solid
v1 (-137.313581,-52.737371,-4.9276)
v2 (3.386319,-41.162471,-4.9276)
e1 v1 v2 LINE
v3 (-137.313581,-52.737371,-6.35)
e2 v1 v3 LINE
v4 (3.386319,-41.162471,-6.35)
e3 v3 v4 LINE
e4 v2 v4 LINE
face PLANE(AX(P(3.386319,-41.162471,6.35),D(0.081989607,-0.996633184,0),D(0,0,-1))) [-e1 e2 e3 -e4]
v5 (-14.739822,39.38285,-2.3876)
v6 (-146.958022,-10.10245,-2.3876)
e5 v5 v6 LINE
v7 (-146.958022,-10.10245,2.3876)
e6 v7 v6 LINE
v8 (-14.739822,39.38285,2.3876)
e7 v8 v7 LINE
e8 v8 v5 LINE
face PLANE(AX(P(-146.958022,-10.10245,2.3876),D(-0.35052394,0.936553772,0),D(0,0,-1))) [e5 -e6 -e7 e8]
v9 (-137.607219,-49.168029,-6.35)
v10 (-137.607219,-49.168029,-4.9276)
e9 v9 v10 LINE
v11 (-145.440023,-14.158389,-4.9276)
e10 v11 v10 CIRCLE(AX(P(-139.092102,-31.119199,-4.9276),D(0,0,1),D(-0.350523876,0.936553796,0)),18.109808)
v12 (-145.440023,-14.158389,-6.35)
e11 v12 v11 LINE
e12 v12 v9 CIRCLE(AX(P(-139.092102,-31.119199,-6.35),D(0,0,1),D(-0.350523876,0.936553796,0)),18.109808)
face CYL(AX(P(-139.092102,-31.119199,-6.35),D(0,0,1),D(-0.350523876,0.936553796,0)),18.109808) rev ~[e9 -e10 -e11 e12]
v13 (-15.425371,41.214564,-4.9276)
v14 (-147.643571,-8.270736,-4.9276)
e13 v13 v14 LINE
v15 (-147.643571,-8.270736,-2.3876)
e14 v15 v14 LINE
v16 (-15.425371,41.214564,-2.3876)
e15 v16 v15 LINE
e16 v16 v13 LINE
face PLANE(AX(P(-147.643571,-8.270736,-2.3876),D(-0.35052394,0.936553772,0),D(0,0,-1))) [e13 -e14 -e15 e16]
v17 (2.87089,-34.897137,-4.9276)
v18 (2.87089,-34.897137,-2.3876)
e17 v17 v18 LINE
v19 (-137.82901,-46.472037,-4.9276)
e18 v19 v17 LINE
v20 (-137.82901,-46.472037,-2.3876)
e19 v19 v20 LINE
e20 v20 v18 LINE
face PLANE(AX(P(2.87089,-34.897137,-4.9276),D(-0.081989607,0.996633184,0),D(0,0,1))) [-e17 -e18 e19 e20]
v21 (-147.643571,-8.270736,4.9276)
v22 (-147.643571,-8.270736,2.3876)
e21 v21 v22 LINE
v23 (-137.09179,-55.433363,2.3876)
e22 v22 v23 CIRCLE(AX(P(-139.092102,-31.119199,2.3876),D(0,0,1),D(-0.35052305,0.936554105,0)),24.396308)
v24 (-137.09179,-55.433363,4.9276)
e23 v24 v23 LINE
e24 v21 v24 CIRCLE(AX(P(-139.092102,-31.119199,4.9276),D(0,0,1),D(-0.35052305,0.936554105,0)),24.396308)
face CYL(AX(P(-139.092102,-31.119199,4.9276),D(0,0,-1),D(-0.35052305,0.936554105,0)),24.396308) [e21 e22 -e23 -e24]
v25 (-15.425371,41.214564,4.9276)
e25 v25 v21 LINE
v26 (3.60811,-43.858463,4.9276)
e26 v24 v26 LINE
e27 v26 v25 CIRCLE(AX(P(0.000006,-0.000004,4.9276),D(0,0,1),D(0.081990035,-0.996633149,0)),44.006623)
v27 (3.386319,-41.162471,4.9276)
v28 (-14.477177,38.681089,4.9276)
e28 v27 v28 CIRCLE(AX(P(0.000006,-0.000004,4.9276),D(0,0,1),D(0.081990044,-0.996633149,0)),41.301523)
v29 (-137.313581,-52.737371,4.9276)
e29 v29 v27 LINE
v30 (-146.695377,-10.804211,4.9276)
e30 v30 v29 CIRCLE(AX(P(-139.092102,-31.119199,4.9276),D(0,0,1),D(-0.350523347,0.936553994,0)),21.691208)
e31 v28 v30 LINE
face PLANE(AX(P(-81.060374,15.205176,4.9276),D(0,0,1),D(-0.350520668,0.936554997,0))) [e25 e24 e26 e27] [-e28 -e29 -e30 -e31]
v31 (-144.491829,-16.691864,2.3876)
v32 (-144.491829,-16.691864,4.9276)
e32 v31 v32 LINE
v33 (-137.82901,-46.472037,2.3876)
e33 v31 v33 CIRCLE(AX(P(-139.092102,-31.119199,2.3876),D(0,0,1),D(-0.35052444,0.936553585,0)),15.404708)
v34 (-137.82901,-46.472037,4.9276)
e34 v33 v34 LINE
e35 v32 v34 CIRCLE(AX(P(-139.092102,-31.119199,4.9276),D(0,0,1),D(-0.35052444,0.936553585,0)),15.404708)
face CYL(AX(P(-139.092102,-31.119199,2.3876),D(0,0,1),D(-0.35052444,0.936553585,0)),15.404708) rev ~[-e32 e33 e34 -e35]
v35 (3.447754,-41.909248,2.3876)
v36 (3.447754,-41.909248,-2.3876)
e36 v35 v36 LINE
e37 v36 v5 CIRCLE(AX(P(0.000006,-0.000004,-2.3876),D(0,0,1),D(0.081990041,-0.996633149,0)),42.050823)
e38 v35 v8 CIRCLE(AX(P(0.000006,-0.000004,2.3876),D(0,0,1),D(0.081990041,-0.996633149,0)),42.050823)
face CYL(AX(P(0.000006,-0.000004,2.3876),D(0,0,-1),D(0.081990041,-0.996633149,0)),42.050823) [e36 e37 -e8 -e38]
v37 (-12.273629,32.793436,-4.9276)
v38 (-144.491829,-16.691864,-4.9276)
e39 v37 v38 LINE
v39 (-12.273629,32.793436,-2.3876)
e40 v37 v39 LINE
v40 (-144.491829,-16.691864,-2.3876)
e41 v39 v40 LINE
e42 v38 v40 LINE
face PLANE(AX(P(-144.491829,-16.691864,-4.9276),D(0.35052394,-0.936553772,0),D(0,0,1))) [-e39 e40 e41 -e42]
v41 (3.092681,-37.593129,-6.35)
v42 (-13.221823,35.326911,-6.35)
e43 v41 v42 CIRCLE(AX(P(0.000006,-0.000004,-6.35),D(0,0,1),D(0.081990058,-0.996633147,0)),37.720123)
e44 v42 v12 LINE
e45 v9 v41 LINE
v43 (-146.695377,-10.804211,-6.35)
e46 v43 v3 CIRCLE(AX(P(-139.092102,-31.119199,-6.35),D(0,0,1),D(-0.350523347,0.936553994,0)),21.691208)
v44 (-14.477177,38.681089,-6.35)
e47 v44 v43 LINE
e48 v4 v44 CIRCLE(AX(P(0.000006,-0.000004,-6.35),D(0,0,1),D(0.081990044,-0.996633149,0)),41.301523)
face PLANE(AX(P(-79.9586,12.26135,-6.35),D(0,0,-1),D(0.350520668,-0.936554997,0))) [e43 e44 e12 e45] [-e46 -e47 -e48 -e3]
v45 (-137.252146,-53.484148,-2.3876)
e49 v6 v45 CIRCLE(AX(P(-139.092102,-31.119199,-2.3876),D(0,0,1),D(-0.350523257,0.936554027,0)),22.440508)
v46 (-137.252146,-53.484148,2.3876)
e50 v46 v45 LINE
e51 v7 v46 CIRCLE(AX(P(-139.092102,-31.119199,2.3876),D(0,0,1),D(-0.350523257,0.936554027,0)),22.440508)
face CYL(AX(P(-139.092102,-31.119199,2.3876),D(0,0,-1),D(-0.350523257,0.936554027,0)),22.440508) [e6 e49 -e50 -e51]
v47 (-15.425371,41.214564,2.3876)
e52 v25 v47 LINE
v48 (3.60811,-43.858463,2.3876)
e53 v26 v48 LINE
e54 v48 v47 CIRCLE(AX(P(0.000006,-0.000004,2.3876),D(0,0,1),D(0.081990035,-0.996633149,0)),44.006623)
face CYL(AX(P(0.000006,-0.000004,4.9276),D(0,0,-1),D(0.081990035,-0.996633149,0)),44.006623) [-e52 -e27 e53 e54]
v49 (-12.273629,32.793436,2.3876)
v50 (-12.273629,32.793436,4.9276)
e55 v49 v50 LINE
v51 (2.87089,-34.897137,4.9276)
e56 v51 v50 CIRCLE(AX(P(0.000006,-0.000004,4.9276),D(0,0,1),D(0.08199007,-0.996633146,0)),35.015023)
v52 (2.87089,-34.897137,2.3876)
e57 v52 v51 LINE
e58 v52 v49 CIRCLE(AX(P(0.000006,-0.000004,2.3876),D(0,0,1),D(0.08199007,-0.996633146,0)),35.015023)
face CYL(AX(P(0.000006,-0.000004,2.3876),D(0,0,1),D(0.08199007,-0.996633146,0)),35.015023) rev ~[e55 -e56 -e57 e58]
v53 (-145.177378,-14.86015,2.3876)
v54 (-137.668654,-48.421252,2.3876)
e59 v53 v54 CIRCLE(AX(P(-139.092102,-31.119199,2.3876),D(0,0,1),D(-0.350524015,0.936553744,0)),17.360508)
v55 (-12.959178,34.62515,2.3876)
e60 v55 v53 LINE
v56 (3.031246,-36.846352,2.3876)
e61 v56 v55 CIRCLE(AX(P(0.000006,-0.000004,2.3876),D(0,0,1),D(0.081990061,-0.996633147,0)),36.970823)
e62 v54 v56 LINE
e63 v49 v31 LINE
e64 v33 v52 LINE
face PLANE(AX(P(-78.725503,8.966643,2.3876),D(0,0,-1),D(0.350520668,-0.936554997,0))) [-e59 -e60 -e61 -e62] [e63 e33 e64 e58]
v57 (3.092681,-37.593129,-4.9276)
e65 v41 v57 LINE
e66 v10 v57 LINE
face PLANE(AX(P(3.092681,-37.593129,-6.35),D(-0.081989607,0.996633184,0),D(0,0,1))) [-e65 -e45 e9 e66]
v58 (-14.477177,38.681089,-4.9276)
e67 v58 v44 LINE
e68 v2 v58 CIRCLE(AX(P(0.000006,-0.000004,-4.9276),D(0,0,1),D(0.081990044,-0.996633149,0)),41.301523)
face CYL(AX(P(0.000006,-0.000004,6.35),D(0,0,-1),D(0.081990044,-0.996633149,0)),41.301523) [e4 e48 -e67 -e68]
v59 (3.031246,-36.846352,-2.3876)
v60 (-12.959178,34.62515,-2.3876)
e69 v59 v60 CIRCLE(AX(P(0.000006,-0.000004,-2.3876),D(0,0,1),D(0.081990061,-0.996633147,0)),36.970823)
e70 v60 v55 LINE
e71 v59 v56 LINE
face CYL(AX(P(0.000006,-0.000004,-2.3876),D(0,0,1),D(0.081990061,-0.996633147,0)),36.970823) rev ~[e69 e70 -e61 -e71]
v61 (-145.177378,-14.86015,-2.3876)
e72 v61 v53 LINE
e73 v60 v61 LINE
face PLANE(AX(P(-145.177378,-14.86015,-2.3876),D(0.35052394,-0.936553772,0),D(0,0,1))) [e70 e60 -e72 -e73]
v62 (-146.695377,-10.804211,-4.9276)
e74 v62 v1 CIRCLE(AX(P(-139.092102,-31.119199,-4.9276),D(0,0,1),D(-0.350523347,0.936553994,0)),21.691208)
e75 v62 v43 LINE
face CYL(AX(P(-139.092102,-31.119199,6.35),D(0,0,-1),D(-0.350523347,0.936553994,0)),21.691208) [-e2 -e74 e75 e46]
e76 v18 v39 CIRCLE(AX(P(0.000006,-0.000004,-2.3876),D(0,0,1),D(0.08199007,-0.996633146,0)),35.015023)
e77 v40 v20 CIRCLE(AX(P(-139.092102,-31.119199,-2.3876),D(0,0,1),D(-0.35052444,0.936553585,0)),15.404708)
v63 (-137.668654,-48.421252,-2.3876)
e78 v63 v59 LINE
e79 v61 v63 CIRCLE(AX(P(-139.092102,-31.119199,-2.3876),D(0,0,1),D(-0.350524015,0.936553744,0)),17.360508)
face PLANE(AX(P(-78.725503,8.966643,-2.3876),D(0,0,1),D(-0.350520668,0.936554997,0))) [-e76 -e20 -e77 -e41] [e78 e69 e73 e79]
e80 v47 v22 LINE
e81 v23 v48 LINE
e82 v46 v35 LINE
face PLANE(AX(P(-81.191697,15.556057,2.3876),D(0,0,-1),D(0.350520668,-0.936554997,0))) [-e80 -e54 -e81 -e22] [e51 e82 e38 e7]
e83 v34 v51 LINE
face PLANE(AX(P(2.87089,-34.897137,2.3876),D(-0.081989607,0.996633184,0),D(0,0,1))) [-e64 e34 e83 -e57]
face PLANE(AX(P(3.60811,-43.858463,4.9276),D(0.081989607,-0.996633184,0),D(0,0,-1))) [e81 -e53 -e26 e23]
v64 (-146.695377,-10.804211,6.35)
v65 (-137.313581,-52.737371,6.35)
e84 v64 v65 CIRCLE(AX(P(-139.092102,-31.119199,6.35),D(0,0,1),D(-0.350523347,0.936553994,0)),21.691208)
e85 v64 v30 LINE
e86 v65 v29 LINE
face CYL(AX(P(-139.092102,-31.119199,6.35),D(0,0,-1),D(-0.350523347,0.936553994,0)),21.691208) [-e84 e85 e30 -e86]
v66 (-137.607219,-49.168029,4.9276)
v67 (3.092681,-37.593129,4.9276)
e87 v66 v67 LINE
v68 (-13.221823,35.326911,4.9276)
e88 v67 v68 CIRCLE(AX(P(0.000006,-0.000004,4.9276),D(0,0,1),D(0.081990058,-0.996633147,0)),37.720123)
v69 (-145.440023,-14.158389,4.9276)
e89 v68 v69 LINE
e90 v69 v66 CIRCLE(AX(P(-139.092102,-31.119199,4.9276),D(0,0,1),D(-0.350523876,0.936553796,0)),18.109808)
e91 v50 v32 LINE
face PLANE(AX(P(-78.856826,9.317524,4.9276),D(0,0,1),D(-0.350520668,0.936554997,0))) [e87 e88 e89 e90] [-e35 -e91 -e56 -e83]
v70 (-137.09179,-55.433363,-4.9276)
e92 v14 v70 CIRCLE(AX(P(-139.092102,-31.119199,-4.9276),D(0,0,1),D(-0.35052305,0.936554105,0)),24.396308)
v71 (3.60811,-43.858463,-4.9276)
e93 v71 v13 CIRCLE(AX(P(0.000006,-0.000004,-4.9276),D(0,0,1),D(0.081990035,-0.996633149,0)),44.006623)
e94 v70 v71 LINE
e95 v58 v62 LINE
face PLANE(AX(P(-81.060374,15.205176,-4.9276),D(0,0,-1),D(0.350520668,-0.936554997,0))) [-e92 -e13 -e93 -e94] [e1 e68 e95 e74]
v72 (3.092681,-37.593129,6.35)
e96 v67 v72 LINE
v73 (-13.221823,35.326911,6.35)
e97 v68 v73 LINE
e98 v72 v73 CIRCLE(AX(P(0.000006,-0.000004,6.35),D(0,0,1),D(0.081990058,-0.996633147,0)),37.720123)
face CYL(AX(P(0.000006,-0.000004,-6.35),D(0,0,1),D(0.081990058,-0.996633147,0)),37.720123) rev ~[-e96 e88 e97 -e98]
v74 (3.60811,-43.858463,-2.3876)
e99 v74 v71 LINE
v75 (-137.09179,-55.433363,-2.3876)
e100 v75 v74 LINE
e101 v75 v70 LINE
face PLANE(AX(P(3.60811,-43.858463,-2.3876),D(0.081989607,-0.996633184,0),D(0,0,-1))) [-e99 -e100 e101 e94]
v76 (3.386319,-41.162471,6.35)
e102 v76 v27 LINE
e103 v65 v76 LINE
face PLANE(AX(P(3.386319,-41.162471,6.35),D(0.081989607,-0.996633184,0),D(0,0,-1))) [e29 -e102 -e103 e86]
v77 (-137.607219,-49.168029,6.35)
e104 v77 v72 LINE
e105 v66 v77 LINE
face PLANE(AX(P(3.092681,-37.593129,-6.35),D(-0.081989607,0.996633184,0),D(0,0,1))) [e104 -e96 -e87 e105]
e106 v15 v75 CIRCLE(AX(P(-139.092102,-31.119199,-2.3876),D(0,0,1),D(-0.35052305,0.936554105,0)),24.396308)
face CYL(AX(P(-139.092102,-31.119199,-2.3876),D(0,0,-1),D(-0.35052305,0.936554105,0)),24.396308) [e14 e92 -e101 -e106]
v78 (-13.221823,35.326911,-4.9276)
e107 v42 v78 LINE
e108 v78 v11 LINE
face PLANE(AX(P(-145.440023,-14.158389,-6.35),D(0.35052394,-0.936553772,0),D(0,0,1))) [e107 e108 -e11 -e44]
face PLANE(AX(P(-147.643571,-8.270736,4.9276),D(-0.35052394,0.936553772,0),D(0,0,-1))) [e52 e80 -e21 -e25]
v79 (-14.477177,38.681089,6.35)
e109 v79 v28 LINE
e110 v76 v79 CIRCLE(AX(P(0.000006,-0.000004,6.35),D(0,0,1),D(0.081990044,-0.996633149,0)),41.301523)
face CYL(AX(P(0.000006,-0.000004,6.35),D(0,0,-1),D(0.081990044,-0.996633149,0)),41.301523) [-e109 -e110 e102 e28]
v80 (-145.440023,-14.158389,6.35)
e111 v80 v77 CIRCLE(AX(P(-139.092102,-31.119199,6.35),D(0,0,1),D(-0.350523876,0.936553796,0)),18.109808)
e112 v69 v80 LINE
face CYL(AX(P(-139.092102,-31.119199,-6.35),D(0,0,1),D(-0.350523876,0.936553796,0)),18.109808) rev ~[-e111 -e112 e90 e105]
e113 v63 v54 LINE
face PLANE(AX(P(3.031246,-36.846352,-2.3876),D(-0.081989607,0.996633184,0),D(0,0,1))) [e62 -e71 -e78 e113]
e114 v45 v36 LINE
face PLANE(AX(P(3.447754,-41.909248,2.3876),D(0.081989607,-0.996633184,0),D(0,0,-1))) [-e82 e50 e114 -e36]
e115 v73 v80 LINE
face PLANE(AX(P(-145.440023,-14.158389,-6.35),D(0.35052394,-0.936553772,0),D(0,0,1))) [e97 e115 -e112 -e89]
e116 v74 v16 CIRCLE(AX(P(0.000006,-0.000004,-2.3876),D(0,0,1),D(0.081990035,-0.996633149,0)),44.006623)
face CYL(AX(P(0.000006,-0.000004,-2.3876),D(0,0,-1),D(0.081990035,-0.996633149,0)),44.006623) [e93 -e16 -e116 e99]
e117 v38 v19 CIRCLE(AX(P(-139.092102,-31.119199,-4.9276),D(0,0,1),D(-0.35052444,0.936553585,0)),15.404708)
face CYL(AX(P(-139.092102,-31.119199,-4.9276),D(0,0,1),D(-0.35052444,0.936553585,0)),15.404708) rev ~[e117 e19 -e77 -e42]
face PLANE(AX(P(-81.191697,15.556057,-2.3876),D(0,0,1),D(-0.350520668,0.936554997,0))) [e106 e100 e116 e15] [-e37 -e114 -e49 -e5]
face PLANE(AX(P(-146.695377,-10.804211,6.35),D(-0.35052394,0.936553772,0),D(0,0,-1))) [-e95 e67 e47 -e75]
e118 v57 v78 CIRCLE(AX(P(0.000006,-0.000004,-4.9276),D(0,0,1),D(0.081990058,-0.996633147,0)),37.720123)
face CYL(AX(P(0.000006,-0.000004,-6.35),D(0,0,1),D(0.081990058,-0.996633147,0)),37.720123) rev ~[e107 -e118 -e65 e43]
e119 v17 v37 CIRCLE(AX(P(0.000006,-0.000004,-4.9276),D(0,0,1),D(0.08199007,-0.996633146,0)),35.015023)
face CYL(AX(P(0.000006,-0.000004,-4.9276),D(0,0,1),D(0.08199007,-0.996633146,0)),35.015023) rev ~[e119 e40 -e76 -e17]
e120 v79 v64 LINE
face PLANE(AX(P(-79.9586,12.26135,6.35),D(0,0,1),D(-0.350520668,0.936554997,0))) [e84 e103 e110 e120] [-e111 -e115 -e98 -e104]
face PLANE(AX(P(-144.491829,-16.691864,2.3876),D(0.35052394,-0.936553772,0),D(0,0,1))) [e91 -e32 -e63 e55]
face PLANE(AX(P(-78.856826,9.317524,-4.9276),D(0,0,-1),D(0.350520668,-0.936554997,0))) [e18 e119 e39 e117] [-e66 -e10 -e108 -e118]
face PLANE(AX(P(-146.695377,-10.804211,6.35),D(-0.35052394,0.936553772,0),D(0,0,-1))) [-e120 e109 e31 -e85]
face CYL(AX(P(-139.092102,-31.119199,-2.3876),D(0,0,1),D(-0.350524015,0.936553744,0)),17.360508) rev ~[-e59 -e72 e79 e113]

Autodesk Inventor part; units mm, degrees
ref_plane "Work Plane2" through (-139.0921, -31.1192, 0) normal (-1, 0, 0) x (0, 0, 1)
ref_plane "Work Plane3" through (0, 0, 0) normal (-0.9907127, -0.1359716, 0) x (0, 0, 1)
sketch "Path" plane through (0, 0, 0) normal (0, 0, 1) x (1, 0, 0)
  arc A0 (-146.0677, -12.4813) -> (-137.4604, -50.9527) centre (-139.0921, -31.1192) ccw
  arc A1 (3.2395, -39.3778) -> (-13.8495, 37.004) centre (0, 0) ccw
  line L0 (3.2395, -39.3778) -> (-137.4604, -50.9527)
  line L1 (-146.0677, -12.4813) -> (-13.8495, 37.004)
  dimension "d31" = 8.9916
ref_plane "Section Plane" through (-137.4604, -50.9527, 0) normal (0.9966332, 0.0819899, 0) x (0, 0, 1)
sketch "Section Sketch" plane through (-137.4604, -50.9527, 0) normal (0.9966332, 0.0819899, 0) x (0, 0, 1)
  line L0 (-6.35, -1.7907) -> (6.35, -1.7907)
  line L1 (6.35, -1.7907) -> (6.35, 1.7907)
  line L2 (6.35, 1.7907) -> (-6.35, 1.7907)
  line L3 (-6.35, 1.7907) -> (-6.35, -1.7907)
  line L4 (-2.3876, -2.54) -> (2.3876, -2.54)
  line L5 (2.3876, -2.54) -> (2.3876, 2.54)
  line L6 (2.3876, 2.54) -> (-2.3876, 2.54)
  line L7 (-2.3876, 2.54) -> (-2.3876, -2.54)
  line L8 (-2.3876, 0) -> (2.3876, 0) construction
  line L9 (-4.9276, -4.4958) -> (-2.3876, -4.4958)
  line L10 (-2.3876, -4.4958) -> (-2.3876, 4.4958)
  line L11 (-2.3876, 4.4958) -> (-4.9276, 4.4958)
  line L12 (-4.9276, 4.4958) -> (-4.9276, -4.4958)
  line L13 (2.3876, -4.4958) -> (4.9276, -4.4958)
  line L14 (4.9276, -4.4958) -> (4.9276, 4.4958)
  line L15 (4.9276, 4.4958) -> (2.3876, 4.4958)
  line L16 (2.3876, 4.4958) -> (2.3876, -4.4958)
  line L17 (-6.35, 0) -> (6.35, 0) construction
  point P0 (0, 0)
  point P1 (0, 0)
  dimension "d21" = 3.5814
  dimension "d22" = 5.08
  dimension "d23" = 4.7752
  dimension "d24" = 2.54
  dimension "d31" = 8.9916
  dimension "d32" = 12.7
sweep "Solid" add profiles "Section Sketch" path "Path"
pattern_of_one "Strand Pattern"
equation "\"d21\" = da_d2"
equation "\"d22\" = da_d1"
equation "\"d23\" = da_b1"
equation "\"d24\" = da_t1 + da_t2"
equation "\"d30\" = da_pt"
equation "\"da_p\" = 9.525"
equation "\"da_b1\" = 4.7752"
equation "\"da_h2\" = 8.9916"
equation "\"da_h3\" = 7.7978"
equation "\"da_d1\" = 5.08"
equation "\"da_d2\" = 3.5814"
equation "\"da_pt\" = 10.1346"
equation "\"da_b\" = 12.7"
equation "\"da_t1\" = 1.27"
equation "\"da_t2\" = 1.27"
properties part number "Roller Chain"
